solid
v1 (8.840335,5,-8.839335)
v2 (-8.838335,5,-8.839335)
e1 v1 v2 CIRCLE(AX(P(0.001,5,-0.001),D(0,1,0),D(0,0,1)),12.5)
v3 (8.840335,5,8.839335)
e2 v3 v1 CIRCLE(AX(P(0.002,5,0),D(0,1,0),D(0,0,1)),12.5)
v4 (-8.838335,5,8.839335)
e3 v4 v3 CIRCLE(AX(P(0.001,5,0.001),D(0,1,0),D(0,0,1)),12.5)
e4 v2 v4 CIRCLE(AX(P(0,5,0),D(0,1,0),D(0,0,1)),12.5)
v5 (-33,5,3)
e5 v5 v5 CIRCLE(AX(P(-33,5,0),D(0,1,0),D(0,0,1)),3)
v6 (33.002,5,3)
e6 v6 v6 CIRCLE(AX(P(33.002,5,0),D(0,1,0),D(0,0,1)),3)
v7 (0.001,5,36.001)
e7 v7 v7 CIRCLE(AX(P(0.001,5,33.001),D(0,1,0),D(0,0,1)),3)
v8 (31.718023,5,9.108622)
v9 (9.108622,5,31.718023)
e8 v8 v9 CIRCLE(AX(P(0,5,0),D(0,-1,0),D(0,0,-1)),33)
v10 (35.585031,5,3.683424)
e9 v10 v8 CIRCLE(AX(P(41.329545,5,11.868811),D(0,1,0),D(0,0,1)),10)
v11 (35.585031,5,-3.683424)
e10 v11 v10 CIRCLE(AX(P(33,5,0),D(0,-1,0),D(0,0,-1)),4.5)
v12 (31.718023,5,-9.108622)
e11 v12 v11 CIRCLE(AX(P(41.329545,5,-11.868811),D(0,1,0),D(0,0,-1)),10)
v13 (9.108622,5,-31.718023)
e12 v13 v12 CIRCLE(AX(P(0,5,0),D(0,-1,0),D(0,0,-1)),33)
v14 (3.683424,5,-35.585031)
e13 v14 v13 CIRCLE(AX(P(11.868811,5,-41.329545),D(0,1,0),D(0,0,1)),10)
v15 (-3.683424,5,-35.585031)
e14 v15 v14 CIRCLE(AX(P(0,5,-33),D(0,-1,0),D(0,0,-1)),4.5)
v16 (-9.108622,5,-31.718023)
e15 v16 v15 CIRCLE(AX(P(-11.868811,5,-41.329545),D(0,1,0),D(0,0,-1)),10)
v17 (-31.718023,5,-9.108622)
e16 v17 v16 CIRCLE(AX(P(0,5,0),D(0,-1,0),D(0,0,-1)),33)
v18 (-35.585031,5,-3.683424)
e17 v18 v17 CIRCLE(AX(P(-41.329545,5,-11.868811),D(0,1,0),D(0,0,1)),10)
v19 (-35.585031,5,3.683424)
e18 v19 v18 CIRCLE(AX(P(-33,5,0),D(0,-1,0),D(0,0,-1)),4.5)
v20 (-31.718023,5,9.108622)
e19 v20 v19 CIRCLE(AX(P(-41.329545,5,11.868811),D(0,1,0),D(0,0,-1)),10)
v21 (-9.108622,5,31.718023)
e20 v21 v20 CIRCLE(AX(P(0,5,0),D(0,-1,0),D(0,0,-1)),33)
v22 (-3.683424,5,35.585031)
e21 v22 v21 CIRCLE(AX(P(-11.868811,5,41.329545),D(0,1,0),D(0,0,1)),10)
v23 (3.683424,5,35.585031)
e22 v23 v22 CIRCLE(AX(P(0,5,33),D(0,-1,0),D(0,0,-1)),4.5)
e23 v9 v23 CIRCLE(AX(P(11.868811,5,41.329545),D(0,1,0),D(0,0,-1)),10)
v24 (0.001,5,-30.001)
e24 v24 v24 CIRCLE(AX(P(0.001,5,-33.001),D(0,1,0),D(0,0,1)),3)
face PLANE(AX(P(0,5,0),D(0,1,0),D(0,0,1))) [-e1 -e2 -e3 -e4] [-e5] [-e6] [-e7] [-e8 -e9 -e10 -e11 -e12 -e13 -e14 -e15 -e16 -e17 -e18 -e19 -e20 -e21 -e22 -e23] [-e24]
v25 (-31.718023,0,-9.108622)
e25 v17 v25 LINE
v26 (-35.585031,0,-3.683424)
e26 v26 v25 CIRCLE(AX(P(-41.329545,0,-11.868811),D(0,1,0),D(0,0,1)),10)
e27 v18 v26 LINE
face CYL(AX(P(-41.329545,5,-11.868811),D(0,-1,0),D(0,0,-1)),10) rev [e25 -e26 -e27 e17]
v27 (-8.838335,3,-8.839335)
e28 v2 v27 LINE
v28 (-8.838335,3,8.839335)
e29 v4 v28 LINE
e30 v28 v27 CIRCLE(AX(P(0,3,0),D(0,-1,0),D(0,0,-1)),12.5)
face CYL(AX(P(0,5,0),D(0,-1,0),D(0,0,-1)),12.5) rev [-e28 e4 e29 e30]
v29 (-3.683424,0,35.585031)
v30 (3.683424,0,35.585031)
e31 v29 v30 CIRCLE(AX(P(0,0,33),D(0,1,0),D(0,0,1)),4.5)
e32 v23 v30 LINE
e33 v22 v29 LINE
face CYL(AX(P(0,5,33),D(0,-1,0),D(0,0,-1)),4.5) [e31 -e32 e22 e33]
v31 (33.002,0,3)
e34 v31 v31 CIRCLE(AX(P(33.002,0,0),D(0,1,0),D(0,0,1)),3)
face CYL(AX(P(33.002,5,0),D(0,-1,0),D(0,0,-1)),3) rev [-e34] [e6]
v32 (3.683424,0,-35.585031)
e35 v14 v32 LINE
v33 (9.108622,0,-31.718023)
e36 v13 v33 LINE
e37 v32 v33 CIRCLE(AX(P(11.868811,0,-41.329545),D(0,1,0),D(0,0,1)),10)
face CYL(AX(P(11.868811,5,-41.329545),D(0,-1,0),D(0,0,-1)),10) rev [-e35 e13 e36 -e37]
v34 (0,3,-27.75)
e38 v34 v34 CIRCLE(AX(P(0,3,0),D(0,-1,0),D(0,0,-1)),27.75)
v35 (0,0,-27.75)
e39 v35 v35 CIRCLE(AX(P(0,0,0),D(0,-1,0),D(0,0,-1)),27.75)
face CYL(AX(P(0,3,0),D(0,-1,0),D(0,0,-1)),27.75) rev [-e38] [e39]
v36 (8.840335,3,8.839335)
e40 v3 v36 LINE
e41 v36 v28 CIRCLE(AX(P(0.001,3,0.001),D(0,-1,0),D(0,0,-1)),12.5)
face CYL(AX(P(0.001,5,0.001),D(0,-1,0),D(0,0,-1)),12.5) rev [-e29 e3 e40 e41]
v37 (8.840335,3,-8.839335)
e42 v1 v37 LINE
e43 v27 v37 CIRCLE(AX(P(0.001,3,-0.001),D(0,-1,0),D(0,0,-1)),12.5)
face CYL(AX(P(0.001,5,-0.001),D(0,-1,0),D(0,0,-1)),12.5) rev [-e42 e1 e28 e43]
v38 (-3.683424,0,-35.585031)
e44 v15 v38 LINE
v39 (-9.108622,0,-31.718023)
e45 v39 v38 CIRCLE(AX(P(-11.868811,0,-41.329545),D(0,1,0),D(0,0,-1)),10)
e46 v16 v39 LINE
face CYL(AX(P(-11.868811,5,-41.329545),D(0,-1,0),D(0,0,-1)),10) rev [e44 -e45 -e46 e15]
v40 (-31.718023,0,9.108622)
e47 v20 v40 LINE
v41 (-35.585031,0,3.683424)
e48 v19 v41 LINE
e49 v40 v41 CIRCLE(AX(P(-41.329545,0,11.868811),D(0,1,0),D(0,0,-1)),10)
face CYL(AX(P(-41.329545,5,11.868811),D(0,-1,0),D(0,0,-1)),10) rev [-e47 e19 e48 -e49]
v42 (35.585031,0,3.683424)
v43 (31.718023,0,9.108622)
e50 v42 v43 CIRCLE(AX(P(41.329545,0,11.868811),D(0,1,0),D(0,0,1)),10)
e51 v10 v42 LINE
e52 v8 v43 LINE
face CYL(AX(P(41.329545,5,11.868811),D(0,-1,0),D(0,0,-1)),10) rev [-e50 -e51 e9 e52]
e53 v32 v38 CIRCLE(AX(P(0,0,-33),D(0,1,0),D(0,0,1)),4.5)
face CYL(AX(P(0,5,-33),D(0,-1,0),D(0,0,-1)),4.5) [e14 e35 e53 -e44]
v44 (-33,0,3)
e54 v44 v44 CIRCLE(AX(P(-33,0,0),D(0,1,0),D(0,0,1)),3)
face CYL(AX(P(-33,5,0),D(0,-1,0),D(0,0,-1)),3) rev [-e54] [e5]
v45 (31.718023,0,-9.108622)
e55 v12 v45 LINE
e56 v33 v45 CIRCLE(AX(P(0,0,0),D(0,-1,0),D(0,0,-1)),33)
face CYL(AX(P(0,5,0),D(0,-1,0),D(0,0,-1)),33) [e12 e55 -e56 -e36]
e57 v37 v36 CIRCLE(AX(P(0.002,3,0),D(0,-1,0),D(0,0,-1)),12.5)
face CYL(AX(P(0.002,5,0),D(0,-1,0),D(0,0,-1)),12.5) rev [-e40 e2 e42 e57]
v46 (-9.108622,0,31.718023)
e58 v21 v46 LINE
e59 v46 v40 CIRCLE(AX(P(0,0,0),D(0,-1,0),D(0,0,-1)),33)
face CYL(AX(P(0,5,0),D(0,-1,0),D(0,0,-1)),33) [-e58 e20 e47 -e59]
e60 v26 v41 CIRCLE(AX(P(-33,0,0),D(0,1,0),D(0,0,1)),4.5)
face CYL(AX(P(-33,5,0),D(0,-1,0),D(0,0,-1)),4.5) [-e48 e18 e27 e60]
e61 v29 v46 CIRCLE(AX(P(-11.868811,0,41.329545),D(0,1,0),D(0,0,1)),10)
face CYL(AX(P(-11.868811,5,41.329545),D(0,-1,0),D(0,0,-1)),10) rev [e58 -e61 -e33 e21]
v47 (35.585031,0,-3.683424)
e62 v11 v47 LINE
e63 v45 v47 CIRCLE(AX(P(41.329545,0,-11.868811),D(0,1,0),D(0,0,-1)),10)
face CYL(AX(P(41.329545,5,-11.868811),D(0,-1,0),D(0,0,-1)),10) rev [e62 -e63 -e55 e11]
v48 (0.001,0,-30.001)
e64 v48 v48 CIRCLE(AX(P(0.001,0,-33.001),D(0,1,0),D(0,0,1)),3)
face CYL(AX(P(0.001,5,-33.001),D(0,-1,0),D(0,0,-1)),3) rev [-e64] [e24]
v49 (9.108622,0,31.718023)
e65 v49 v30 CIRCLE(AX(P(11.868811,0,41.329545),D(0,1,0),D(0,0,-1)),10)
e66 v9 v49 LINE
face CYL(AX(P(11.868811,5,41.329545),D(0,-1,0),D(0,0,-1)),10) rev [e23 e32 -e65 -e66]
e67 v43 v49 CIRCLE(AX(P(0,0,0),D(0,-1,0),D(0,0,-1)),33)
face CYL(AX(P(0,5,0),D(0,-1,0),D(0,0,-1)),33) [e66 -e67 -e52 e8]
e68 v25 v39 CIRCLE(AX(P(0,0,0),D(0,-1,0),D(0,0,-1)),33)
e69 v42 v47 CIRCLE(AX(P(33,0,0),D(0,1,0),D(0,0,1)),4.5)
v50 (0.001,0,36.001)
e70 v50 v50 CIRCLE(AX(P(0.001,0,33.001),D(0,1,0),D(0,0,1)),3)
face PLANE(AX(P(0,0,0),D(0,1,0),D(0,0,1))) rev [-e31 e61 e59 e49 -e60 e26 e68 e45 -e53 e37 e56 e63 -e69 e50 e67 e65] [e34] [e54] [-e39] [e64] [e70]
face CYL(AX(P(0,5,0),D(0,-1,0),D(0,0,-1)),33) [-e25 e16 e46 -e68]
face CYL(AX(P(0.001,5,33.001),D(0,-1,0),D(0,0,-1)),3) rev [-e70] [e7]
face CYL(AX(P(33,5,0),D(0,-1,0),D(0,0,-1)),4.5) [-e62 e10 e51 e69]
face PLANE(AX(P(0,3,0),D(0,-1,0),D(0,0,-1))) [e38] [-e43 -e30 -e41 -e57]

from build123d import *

# Parameters (mm, degrees)
BOSS_EXTRUDE1_OUTLINE_W = 75
BOSS_EXTRUDE1_OUTLINE_H = 75
BOSS_EXTRUDE1_OUTLINE_R = 3
BOSS_EXTRUDE1_DEPTH     = 5
SKETCH2_R               = 27.75
CUT_EXTRUDE1_DEPTH      = 3
SKETCH3_OUTSIDE_W       = 98.236
SKETCH3_OUTSIDE_H       = 98.236
CUT_EXTRUDE5_DEPTH      = 5


# Read off the part's stored shape, not the designer's step: Boss-Extrude1
with BuildPart() as part:
    # Boss-Extrude1 outline → Boss-Extrude1 (new body)
    with BuildSketch(Plane(origin=(0, 0, 0), x_dir=(1, 0, 0), z_dir=(0, 1, 0))):
        Rectangle(BOSS_EXTRUDE1_OUTLINE_W, BOSS_EXTRUDE1_OUTLINE_H)
        with Locations((0.001, -33.001)):
            Circle(BOSS_EXTRUDE1_OUTLINE_R, mode=Mode.SUBTRACT)
        with Locations((-33, 0)):
            Circle(BOSS_EXTRUDE1_OUTLINE_R, mode=Mode.SUBTRACT)
        with BuildLine():
            ThreePointArc((8.840334751, 8.839334751), (12.502, 0), (8.840334751, -8.839334751))
            ThreePointArc((8.840334751, -8.839334751), (0.001, -12.501), (-8.838334751, -8.839334751))
            ThreePointArc((-8.838334751, -8.839334751), (-12.5, 0), (-8.838334751, 8.839334751))
            ThreePointArc((-8.838334751, 8.839334751), (0.001, 12.501), (8.840334751, 8.839334751))
        make_face(mode=Mode.SUBTRACT)
        with Locations((33.002, 0)):
            Circle(BOSS_EXTRUDE1_OUTLINE_R, mode=Mode.SUBTRACT)
        with Locations((0.001, 33.001)):
            Circle(BOSS_EXTRUDE1_OUTLINE_R, mode=Mode.SUBTRACT)
    extrude(amount=BOSS_EXTRUDE1_DEPTH)

    # Sketch2 → Cut-Extrude1 (cut)
    with BuildSketch(Plane.XZ):
        with Locations(Location((0, 0, 0), (0, 0, 270))):
            Circle(SKETCH2_R)
    extrude(amount=-CUT_EXTRUDE1_DEPTH, mode=Mode.SUBTRACT)

    # Sketch3 outside → Cut-Extrude5 (cut)
    with BuildSketch(Plane.XZ):
        Rectangle(SKETCH3_OUTSIDE_W, SKETCH3_OUTSIDE_H)
        with BuildLine():
            ThreePointArc((-31.718023256, -9.10862233), (-23.334523779, -23.334523779), (-9.10862233, -31.718023256))
            ThreePointArc((-9.10862233, -31.718023256), (-6.064515675, -33.186440594), (-3.683424077, -35.585031348))
            ThreePointArc((-3.683424077, -35.585031348), (0, -37.5), (3.683424077, -35.585031348))
            ThreePointArc((3.683424077, -35.585031348), (6.064515675, -33.186440594), (9.10862233, -31.718023256))
            ThreePointArc((9.10862233, -31.718023256), (23.334523779, -23.334523779), (31.718023256, -9.10862233))
            ThreePointArc((31.718023256, -9.10862233), (33.186440594, -6.064515675), (35.585031348, -3.683424077))
            ThreePointArc((35.585031348, -3.683424077), (37.5, 0), (35.585031348, 3.683424077))
            ThreePointArc((35.585031348, 3.683424077), (33.186440594, 6.064515675), (31.718023256, 9.10862233))
            ThreePointArc((31.718023256, 9.10862233), (23.334523779, 23.334523779), (9.10862233, 31.718023256))
            ThreePointArc((9.10862233, 31.718023256), (6.064515675, 33.186440594), (3.683424077, 35.585031348))
            ThreePointArc((3.683424077, 35.585031348), (0, 37.5), (-3.683424077, 35.585031348))
            ThreePointArc((-3.683424077, 35.585031348), (-6.064515675, 33.186440594), (-9.10862233, 31.718023256))
            ThreePointArc((-9.10862233, 31.718023256), (-23.334523779, 23.334523779), (-31.718023256, 9.10862233))
            ThreePointArc((-31.718023256, 9.10862233), (-33.186440594, 6.064515675), (-35.585031348, 3.683424077))
            ThreePointArc((-35.585031348, 3.683424077), (-37.5, 0), (-35.585031348, -3.683424077))
            ThreePointArc((-35.585031348, -3.683424077), (-33.186440594, -6.064515675), (-31.718023256, -9.10862233))
        make_face(mode=Mode.SUBTRACT)
    extrude(amount=-CUT_EXTRUDE5_DEPTH, mode=Mode.SUBTRACT)


solid = part.part
